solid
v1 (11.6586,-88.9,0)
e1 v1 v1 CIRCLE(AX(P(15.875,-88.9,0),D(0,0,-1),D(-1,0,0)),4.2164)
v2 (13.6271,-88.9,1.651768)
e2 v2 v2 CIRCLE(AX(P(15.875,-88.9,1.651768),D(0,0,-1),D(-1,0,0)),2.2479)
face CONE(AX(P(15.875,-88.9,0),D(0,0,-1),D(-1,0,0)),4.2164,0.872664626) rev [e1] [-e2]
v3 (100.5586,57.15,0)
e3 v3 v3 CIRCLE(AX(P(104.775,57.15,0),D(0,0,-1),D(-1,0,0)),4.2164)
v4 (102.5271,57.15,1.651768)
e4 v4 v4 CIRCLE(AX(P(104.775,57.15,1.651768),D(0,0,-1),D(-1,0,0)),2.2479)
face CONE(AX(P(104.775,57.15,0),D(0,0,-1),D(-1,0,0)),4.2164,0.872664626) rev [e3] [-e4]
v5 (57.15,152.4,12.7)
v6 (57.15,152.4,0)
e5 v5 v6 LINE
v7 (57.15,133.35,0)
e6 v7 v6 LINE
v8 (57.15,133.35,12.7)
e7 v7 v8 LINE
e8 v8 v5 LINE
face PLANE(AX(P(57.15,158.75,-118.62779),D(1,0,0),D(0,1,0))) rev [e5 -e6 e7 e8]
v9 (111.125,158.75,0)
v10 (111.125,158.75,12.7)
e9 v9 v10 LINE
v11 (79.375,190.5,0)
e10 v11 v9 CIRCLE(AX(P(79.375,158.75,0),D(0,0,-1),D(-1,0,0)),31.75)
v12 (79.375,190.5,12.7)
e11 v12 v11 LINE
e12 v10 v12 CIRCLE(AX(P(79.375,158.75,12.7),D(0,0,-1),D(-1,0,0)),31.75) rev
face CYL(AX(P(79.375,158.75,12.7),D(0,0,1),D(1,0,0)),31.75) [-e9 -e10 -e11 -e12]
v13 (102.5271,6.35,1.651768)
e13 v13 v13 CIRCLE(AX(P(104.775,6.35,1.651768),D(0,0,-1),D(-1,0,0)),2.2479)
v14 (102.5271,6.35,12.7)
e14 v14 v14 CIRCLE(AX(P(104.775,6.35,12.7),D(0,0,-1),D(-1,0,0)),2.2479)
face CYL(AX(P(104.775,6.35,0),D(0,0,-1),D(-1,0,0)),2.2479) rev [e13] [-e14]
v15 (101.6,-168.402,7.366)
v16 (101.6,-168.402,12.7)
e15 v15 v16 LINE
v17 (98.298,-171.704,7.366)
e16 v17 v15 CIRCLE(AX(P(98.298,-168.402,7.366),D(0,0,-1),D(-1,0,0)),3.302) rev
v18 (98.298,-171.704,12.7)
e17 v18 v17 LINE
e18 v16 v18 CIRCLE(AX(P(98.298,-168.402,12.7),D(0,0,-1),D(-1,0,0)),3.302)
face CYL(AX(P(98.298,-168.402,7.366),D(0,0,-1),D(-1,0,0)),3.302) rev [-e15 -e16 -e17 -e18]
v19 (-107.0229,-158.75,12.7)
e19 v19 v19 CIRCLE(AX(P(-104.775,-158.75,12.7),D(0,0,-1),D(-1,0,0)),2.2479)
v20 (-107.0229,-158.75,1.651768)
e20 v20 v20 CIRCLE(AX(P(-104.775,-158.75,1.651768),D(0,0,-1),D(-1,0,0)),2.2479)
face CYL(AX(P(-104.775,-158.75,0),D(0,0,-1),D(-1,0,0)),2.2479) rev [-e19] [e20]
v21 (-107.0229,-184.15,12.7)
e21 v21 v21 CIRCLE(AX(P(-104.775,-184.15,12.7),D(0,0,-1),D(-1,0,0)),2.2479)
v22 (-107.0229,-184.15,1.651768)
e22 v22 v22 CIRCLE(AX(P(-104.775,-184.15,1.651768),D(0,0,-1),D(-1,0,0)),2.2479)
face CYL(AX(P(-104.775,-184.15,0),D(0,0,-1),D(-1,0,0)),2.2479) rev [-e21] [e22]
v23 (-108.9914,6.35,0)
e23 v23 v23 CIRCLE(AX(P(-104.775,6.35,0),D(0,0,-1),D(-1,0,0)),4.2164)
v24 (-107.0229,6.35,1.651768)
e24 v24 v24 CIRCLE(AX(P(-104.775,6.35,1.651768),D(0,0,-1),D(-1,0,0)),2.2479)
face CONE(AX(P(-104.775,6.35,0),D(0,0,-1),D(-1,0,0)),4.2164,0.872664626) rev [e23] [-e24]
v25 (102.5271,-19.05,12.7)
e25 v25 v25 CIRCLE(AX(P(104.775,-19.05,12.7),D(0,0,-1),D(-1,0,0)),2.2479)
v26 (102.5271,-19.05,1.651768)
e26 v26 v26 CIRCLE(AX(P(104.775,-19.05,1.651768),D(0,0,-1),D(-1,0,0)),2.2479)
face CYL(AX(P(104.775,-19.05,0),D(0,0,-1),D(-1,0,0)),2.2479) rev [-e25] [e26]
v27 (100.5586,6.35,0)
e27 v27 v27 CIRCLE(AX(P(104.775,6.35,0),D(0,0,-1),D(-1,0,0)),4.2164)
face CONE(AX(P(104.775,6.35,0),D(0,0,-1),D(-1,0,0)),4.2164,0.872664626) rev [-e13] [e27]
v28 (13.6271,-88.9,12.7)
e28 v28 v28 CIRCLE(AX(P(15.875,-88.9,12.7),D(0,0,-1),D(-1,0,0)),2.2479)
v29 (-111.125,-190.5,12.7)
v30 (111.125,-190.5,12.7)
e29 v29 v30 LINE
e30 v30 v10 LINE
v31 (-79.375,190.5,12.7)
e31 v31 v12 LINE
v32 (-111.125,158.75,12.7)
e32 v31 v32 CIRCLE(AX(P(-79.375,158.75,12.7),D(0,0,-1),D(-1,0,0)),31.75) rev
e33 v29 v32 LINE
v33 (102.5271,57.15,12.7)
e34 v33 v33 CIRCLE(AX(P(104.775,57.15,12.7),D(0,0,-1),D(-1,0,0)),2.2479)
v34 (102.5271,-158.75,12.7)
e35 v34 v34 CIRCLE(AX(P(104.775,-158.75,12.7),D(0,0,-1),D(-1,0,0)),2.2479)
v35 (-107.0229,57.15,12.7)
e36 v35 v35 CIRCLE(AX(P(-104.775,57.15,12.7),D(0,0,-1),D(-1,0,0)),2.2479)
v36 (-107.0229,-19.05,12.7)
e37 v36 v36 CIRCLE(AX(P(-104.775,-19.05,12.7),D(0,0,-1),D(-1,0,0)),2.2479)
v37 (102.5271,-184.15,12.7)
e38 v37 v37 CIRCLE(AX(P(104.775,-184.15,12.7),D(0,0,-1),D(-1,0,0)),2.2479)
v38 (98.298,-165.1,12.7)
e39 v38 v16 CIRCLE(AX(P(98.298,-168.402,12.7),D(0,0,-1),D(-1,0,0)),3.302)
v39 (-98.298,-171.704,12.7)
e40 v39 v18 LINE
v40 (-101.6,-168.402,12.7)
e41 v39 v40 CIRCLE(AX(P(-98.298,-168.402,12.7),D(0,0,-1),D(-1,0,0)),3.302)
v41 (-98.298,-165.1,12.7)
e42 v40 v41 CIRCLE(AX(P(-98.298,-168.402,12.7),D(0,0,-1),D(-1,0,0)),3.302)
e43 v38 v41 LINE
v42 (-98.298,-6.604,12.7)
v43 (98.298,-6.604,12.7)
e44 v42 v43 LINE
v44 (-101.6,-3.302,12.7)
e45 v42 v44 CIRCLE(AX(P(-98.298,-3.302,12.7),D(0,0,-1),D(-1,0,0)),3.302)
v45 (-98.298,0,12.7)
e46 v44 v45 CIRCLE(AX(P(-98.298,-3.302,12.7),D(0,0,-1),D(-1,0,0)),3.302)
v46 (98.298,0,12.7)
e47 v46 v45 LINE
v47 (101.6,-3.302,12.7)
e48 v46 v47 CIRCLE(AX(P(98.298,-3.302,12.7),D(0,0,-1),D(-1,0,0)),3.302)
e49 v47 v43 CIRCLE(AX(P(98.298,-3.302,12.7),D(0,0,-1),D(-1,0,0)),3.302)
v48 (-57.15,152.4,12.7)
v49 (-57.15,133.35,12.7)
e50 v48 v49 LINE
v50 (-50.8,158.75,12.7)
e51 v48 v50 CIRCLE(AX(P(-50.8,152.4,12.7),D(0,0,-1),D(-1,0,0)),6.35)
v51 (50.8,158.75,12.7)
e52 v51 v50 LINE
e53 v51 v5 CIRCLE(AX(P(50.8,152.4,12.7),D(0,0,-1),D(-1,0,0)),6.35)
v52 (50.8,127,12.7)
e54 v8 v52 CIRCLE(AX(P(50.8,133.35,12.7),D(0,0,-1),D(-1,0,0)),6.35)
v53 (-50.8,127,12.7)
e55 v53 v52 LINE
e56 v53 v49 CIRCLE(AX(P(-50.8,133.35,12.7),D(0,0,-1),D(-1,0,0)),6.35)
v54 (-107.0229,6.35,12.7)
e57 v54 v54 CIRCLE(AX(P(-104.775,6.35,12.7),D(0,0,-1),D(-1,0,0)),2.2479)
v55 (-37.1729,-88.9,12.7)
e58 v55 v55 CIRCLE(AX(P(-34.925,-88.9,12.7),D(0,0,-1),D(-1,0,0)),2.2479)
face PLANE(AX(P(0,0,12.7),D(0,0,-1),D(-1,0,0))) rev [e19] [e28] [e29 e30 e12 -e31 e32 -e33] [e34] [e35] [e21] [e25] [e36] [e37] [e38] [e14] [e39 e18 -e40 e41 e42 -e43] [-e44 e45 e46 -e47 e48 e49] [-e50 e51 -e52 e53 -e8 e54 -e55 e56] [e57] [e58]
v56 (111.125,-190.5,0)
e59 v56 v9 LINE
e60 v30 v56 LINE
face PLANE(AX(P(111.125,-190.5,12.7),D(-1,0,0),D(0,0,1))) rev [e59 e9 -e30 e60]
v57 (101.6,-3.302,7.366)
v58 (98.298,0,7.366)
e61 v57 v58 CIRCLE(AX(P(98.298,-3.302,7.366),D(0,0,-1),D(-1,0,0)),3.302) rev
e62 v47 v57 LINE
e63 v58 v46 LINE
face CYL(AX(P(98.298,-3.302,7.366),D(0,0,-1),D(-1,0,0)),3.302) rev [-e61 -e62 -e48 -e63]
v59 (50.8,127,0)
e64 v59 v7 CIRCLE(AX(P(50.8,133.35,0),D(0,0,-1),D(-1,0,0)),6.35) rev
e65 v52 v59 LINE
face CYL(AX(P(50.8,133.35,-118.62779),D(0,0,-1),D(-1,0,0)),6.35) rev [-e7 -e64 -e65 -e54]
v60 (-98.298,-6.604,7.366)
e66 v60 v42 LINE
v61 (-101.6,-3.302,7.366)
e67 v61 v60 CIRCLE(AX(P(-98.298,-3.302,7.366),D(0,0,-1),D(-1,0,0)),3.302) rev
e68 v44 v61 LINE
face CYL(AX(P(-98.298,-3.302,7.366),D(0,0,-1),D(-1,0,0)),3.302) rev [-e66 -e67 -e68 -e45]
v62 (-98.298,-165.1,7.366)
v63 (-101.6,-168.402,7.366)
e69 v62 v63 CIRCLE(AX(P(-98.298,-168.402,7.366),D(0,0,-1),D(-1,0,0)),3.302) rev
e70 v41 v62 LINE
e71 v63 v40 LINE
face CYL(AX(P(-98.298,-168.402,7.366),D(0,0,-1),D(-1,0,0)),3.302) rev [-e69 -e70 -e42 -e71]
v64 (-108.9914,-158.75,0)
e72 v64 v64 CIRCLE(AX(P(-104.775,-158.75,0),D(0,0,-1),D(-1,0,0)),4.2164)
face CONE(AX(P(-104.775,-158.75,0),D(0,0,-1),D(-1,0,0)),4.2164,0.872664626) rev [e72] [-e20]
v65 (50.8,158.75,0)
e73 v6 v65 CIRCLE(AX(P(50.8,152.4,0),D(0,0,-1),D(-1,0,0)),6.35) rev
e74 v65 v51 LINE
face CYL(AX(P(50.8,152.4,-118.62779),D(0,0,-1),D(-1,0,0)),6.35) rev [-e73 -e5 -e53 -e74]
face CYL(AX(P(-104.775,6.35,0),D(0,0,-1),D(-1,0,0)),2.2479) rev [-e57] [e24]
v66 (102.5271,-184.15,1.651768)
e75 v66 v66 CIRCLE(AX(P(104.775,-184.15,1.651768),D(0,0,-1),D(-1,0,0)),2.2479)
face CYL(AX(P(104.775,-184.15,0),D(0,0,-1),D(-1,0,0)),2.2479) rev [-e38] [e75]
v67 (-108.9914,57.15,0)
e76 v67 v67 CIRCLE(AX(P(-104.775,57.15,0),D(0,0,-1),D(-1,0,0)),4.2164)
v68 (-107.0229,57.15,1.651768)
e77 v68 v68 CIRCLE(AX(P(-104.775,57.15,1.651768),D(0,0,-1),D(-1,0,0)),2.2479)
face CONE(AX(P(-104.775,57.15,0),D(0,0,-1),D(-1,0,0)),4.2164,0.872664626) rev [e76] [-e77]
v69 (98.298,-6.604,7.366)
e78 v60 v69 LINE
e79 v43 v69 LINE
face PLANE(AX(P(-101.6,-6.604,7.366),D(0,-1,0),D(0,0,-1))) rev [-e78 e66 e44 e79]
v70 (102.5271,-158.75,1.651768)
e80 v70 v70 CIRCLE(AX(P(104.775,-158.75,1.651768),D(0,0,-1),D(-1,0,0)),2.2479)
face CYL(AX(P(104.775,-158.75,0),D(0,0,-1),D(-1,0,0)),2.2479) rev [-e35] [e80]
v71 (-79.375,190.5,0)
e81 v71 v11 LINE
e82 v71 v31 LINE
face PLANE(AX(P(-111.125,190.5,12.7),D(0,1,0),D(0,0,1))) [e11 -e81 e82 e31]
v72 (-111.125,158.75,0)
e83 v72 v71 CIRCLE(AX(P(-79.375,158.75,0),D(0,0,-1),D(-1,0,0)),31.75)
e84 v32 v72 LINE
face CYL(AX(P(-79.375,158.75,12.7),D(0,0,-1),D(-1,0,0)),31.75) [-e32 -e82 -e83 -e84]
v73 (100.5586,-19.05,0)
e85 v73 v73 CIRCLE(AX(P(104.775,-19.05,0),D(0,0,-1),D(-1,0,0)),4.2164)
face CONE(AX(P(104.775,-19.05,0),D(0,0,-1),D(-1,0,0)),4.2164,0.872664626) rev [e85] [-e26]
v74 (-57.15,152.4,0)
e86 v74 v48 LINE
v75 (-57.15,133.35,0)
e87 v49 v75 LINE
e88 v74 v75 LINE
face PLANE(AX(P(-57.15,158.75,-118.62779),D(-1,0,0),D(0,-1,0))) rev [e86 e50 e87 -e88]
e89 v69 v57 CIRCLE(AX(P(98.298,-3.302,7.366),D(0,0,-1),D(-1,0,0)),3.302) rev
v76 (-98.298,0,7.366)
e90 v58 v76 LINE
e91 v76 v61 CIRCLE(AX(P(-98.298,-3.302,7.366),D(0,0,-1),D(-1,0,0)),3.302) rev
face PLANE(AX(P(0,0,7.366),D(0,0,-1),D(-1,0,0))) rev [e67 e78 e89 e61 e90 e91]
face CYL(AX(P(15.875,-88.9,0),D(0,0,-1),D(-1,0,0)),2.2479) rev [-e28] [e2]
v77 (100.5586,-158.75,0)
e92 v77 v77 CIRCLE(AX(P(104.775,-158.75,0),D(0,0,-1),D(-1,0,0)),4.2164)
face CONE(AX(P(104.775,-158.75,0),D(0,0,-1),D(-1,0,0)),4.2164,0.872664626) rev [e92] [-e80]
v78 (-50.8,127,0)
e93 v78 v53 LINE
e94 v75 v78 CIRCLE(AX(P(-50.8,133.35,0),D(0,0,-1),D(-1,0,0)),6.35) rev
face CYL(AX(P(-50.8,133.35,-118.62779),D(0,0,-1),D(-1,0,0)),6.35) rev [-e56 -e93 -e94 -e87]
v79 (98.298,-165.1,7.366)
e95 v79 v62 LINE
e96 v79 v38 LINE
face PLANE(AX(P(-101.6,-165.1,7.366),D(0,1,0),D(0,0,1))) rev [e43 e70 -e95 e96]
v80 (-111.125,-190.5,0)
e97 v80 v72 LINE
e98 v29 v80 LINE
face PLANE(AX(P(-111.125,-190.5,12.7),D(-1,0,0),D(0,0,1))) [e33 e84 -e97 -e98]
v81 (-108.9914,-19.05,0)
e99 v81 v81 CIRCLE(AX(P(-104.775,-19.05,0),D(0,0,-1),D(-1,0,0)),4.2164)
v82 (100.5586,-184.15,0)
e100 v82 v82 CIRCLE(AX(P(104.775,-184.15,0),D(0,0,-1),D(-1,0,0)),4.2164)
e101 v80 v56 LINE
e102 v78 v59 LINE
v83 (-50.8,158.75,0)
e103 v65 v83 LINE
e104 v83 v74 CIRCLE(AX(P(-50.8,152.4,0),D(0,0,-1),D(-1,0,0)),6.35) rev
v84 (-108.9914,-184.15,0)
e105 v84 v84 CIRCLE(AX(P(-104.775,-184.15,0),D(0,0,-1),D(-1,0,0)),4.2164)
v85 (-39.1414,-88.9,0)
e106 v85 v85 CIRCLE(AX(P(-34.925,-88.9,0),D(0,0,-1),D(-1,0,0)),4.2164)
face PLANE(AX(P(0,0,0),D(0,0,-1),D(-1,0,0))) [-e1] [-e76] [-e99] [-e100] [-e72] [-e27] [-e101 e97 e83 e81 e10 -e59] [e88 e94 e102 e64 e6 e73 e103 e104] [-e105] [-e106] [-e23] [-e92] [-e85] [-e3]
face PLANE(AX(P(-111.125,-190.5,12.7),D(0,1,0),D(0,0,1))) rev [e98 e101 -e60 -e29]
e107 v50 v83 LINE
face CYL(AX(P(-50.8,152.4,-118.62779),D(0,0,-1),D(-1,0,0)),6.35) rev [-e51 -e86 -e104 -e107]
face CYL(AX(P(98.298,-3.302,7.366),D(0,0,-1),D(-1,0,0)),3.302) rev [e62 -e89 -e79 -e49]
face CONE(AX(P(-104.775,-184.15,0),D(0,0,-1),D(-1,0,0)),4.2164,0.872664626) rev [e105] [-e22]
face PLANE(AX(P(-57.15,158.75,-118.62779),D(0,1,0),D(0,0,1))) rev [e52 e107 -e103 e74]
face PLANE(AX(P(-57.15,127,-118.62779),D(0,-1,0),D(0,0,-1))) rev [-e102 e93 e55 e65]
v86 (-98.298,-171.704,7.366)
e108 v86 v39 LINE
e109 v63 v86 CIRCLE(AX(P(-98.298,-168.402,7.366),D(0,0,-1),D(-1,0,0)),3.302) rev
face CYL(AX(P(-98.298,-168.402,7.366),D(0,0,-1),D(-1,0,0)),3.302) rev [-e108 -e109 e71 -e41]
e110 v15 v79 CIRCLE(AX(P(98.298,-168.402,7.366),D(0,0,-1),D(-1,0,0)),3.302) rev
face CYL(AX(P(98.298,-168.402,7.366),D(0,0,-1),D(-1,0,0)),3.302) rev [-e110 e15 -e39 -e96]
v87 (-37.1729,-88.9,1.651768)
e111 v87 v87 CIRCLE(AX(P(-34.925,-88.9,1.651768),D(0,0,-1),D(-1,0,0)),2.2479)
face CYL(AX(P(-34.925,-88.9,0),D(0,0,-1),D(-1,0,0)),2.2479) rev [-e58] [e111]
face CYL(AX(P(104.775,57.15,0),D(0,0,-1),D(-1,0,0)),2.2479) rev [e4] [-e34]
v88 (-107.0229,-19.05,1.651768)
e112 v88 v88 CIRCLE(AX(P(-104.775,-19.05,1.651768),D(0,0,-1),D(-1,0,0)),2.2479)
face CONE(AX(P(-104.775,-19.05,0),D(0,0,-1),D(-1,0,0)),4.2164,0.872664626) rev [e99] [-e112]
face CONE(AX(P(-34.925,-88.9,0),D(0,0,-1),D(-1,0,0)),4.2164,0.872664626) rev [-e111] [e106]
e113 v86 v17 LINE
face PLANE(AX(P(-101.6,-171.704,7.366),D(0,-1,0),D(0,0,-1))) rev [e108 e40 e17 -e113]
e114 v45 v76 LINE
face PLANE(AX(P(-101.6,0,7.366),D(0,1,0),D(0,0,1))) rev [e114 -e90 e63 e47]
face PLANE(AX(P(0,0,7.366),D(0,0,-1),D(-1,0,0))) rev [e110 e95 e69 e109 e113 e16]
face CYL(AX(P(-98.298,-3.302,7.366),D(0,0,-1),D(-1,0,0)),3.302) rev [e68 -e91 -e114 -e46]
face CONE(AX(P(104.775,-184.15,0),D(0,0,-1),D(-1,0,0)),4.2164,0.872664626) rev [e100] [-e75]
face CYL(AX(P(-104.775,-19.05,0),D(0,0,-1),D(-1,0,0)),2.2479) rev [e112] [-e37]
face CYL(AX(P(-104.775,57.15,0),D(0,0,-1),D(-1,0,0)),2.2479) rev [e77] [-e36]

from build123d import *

# Parameters (mm, degrees)
SKETCH1_W                                         = 222.25
SKETCH1_H                                         = 381
BOSS_EXTRUDE1_DEPTH                               = 12.7
FILLET1_R                                         = 31.75
SKETCH2_W                                         = 114.3
SKETCH2_H                                         = 31.75
CUT_EXTRUDE1_DEPTH                                = 12.7
FILLET2_R                                         = 6.35
SKETCH3_W                                         = 203.2
SKETCH3_H                                         = 6.604
CUT_EXTRUDE2_DEPTH                                = 5.334
FILLET3_R                                         = 3.302
CSK_FOR_8_FLAT_HEAD_MACHINE_SCREW_100_D           = 4.4958
CSK_FOR_8_FLAT_HEAD_MACHINE_SCREW_100_CSINK_D     = 8.4328
CSK_FOR_8_FLAT_HEAD_MACHINE_SCREW_100_CSINK_ANGLE = 100


with BuildPart() as part:
    # Sketch1 → Boss-Extrude1 (new body)
    with BuildSketch(Plane.XY):
        Rectangle(SKETCH1_W, SKETCH1_H)
    extrude(amount=BOSS_EXTRUDE1_DEPTH)

    # Fillet1
    fillet1_edges = [part.edges().sort_by_distance(p)[0] for p in [
        (111.125, 190.5, 6.35),
        (-111.125, 190.5, 6.35),
    ]]
    fillet(fillet1_edges, radius=FILLET1_R)

    # Sketch2 → Cut-Extrude1 (cut)
    with BuildSketch(Plane.XY.offset(12.7)):
        with Locations((0, 142.875)):
            Rectangle(SKETCH2_W, SKETCH2_H)
    extrude(amount=-CUT_EXTRUDE1_DEPTH, mode=Mode.SUBTRACT)

    # Fillet2
    fillet2_edges = [part.edges().sort_by_distance(p)[0] for p in [
        (57.15, 127, 6.35),
        (57.15, 158.75, 6.35),
        (-57.15, 158.75, 6.35),
        (-57.15, 127, 6.35),
    ]]
    fillet(fillet2_edges, radius=FILLET2_R)

    # Sketch3 → Cut-Extrude2 (cut)
    with BuildSketch(Plane.XY.offset(12.7)):
        with Locations((0, -168.402)):
            Rectangle(SKETCH3_W, SKETCH3_H)
        with Locations((0, -3.302)):
            Rectangle(SKETCH3_W, SKETCH3_H)
    extrude(amount=-CUT_EXTRUDE2_DEPTH, mode=Mode.SUBTRACT)

    # Fillet3
    fillet3_edges = [part.edges().sort_by_distance(p)[0] for p in [
        (101.6, -165.1, 10.033),
        (101.6, -171.704, 10.033),
        (-101.6, -171.704, 10.033),
        (-101.6, -165.1, 10.033),
        (101.6, -6.604, 10.033),
        (101.6, 0, 10.033),
        (-101.6, 0, 10.033),
        (-101.6, -6.604, 10.033),
    ]]
    fillet(fillet3_edges, radius=FILLET3_R - 0.0001)  # a hair under: the kernel refuses the full size

    # CSK for #8 Flat Head Machine Screw (100)1 (through all)
    with Locations(Plane(origin=(0, 0, 0), x_dir=(-1, 0, 0), z_dir=(0, 0, -1))):
        with Locations((-104.775, -184.15), (-104.775, -158.75), (104.775, -158.75), (104.775, -184.15), (-104.775, -19.05), (-104.775, 6.35), (104.775, 6.35), (104.775, -19.05), (-104.775, 57.15), (104.775, 57.15), (-15.875, -88.9), (34.925, -88.9)):
            CounterSinkHole(CSK_FOR_8_FLAT_HEAD_MACHINE_SCREW_100_D / 2, CSK_FOR_8_FLAT_HEAD_MACHINE_SCREW_100_CSINK_D / 2, counter_sink_angle=CSK_FOR_8_FLAT_HEAD_MACHINE_SCREW_100_CSINK_ANGLE)


solid = part.part
